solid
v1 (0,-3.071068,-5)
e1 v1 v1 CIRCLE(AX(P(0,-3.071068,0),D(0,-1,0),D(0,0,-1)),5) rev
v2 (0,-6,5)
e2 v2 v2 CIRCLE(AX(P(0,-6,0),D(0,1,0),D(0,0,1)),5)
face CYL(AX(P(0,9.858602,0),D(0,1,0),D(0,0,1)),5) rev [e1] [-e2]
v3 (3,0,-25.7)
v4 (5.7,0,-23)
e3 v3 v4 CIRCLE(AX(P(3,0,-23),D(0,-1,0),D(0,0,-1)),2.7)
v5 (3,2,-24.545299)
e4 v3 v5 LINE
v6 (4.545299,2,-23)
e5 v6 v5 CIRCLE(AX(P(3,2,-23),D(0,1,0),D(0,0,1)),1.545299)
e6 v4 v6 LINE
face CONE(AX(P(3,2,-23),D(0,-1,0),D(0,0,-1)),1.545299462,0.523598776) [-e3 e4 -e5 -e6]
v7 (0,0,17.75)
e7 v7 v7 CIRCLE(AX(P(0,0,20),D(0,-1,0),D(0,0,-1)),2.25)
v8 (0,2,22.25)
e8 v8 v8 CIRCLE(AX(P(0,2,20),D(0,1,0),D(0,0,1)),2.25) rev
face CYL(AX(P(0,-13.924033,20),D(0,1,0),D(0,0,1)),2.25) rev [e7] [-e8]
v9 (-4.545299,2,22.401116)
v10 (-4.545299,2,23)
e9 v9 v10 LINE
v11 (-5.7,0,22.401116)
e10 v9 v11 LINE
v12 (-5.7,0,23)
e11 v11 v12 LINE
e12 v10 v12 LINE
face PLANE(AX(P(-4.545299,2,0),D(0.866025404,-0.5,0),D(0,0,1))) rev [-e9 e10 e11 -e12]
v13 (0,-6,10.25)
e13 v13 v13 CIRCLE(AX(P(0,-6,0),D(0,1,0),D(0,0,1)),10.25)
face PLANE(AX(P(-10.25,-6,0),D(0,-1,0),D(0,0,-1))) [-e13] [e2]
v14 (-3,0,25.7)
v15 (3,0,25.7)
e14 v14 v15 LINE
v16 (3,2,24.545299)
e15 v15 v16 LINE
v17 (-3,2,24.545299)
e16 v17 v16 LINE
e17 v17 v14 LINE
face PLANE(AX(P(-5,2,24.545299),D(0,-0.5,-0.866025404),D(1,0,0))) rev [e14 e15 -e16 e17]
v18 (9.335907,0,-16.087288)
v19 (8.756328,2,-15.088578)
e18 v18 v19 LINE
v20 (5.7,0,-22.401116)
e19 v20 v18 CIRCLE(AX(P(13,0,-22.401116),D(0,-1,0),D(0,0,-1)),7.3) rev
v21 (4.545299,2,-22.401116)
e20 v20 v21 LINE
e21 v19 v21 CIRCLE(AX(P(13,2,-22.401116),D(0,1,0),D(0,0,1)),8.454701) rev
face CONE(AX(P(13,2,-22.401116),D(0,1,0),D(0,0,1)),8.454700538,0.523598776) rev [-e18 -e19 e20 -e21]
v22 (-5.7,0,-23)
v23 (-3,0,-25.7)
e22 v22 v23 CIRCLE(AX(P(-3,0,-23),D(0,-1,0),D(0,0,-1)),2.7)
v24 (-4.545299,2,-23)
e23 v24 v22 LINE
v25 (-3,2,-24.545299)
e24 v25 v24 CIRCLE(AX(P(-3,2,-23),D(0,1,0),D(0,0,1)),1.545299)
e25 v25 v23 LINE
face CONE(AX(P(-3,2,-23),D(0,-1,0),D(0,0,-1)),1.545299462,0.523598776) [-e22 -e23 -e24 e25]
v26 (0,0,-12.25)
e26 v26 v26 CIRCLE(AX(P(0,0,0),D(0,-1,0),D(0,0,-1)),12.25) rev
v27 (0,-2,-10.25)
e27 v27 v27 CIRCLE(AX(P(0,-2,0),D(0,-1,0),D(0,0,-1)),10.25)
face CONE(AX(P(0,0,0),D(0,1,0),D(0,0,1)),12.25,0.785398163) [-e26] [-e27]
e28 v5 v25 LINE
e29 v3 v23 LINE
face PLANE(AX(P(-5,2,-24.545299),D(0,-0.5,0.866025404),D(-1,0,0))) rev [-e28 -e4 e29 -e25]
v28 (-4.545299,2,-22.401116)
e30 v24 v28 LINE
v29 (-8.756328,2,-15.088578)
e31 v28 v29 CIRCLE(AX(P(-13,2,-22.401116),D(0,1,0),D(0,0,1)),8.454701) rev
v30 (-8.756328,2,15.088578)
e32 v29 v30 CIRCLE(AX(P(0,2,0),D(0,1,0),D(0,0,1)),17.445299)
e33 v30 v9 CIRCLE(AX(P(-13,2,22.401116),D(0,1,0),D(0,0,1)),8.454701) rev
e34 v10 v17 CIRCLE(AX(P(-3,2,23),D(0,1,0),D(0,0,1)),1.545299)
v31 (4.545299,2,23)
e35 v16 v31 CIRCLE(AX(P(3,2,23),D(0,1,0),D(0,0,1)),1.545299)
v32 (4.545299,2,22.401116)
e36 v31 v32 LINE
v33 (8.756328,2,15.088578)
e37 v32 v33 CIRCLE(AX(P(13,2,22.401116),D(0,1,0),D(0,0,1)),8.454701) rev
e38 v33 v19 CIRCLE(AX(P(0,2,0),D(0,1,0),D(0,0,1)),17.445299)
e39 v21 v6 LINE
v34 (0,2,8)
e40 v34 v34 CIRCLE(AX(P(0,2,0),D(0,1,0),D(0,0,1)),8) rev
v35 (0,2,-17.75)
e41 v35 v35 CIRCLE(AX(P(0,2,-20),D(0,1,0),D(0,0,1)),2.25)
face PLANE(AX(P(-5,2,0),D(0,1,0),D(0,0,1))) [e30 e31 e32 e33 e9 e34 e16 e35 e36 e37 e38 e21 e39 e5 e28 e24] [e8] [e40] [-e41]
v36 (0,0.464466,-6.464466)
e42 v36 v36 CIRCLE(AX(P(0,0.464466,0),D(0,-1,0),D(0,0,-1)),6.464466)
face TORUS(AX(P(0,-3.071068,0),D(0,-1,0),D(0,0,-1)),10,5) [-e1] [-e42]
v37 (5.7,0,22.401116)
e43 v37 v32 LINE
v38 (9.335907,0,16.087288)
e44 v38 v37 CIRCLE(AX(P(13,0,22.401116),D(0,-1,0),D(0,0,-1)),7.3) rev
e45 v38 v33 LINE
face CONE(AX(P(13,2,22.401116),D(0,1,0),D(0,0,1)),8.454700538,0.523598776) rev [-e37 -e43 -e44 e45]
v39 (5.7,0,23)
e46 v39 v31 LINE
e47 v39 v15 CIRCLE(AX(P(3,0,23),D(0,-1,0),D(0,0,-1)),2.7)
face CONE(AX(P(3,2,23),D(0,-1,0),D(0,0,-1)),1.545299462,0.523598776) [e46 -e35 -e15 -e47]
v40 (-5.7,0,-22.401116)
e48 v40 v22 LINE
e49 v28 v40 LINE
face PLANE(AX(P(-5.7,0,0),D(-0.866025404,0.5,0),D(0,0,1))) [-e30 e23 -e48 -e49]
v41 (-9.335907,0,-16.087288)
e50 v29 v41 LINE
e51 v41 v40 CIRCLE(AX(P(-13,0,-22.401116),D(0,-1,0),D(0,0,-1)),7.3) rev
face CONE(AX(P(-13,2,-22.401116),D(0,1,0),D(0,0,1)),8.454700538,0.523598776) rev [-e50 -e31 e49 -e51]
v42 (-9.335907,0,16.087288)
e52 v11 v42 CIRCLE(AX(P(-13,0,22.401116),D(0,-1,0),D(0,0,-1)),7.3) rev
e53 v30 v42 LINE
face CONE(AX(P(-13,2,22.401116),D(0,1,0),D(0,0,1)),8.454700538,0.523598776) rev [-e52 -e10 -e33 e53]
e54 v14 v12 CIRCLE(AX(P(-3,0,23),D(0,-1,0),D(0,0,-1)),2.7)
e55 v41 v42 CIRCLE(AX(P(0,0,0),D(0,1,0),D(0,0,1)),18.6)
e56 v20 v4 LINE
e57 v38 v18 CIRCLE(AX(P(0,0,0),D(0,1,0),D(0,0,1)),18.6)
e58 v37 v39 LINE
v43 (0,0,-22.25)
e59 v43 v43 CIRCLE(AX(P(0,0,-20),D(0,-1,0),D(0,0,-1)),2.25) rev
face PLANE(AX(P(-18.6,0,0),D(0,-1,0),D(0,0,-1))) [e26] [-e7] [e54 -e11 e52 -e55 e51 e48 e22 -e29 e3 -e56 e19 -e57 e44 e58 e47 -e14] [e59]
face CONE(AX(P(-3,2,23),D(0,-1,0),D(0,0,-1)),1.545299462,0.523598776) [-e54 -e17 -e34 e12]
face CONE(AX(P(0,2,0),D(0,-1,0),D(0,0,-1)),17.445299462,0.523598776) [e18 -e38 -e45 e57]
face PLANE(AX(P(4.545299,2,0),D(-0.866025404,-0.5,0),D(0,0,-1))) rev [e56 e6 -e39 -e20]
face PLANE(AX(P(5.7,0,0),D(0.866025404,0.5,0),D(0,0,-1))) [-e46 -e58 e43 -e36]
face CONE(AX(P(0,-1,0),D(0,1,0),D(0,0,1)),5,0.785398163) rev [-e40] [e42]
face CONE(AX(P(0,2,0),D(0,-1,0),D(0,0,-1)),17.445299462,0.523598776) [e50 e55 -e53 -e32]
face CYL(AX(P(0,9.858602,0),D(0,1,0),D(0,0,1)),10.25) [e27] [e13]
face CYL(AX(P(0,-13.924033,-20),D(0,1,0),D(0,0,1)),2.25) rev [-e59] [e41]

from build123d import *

# Parameters (mm, degrees)
BOSS_EXTRUDE1_START = -2
BOSS_EXTRUDE1_DEPTH = 2
CUT_EXTRUDE1_REACH  = 34.718
SKETCH2_3_R         = 2.25
FILLET1_R           = 7.3
FILLET2_R           = 2.7
CHAMFER1_SIZE       = 1.154700538
CHAMFER1_SIZE_2     = 2
CHAMFER2_SIZE       = 3
FILLET3_R           = 5
CHAMFER3_SIZE       = 2


with BuildPart() as part:
    # Sketch1 → Revolve1 (revolve)
    with BuildSketch(Plane.XY, mode=Mode.PRIVATE) as revolve1_sk:
        Polygon((-5, 0), (-5, 2), (-18.6, 2), (-18.6, 0), (-10.25, 0), (-10.25, -6), (-5, -6), align=None)
    revolve(revolve1_sk.sketch.rotate(Axis((0, 9.858601723, 0), (0, -1, 0)), 270), axis=Axis((0, 9.858601723, 0), (0, -1, 0)))

    # Sketch2 → Boss-Extrude1 (add)
    with BuildSketch(Plane(origin=(0, 2, 0), x_dir=(1, 0, 0), z_dir=(0, 1, 0)).offset(BOSS_EXTRUDE1_START)):
        with BuildLine():
            Line((-5.7, 25.7), (-5.7, 17.705084016))
            ThreePointArc((-5.7, 17.705084016), (-3.720937263, 18.224012343), (-1.696852692, 18.5224375))
            ThreePointArc((-1.696852692, 18.5224375), (-0.788854056, 22.10718041), (2.25, 20))
            ThreePointArc((2.25, 20), (2.10718041, 19.211145944), (1.696852692, 18.5224375))
            ThreePointArc((1.696852692, 18.5224375), (3.720937263, 18.224012343), (5.7, 17.705084016))
            Line((5.7, 17.705084016), (5.7, 25.7))
            Line((5.7, 25.7), (0.005376723, 25.7))
            Line((0.005376723, 25.7), (-0.005376723, 25.7))
            Line((-0.005376723, 25.7), (-5.7, 25.7))
        make_face()
        with BuildLine():
            ThreePointArc((-1.696852692, -18.5224375), (-3.720937263, -18.224012343), (-5.7, -17.705084016))
            Line((-5.7, -17.705084016), (-5.7, -25.7))
            Line((-5.7, -25.7), (-0.005376723, -25.7))
            Line((-0.005376723, -25.7), (0.005376723, -25.7))
            Line((0.005376723, -25.7), (5.7, -25.7))
            Line((5.7, -25.7), (5.7, -17.705084016))
            ThreePointArc((5.7, -17.705084016), (3.720937263, -18.224012343), (1.696852692, -18.5224375))
            ThreePointArc((1.696852692, -18.5224375), (2.10718041, -19.211145944), (2.25, -20))
            ThreePointArc((2.25, -20), (-0.788854056, -22.10718041), (-1.696852692, -18.5224375))
        make_face()
    extrude(amount=BOSS_EXTRUDE1_DEPTH)

    # Sketch2<3> → Cut-Extrude1 (cut, up to next)
    with BuildSketch(Plane(origin=(0, 2, 0), x_dir=(1, 0, 0), z_dir=(0, 1, 0)), mode=Mode.PRIVATE) as cut_extrude1_sk1:
        with Locations(Location((0, 20, 0), (0, 0, 270))):
            Circle(SKETCH2_3_R)
    cut_extrude1_tool1 = extrude(cut_extrude1_sk1.sketch, amount=-CUT_EXTRUDE1_REACH, mode=Mode.PRIVATE) & part.part
    # Sketch2<3> → Cut-Extrude1 (cut, up to next)
    with BuildSketch(Plane(origin=(0, 2, 0), x_dir=(1, 0, 0), z_dir=(0, 1, 0)), mode=Mode.PRIVATE) as cut_extrude1_sk2:
        with Locations(Location((0, -20, 0), (0, 0, 270))):
            Circle(SKETCH2_3_R)
    cut_extrude1_tool2 = extrude(cut_extrude1_sk2.sketch, amount=-CUT_EXTRUDE1_REACH, mode=Mode.PRIVATE) & part.part
    add(cut_extrude1_tool1.solids().sort_by_distance((0, 2, -20))[0], mode=Mode.SUBTRACT)
    add(cut_extrude1_tool2.solids().sort_by_distance((0, 2, 20))[0], mode=Mode.SUBTRACT)

    # Fillet1
    fillet1_edges = [part.edges().sort_by_distance(p)[0] for p in [
        (-5.7, 1, -17.705084016),
        (5.7, 1, -17.705084016),
        (-5.7, 1, 17.705084016),
        (5.7, 1, 17.705084016),
    ]]
    fillet(fillet1_edges, radius=FILLET1_R)

    # Fillet2
    fillet2_edges = [part.edges().sort_by_distance(p)[0] for p in [
        (-5.7, 1, -25.7),
        (5.7, 1, -25.7),
        (-5.7, 1, 25.7),
        (5.7, 1, 25.7),
    ]]
    fillet(fillet2_edges, radius=FILLET2_R)

    # Chamfer1
    # the kernel refuses this chamfer: 2, 1.154700538 mm, written as the material it takes off along each edge
    with BuildSketch(Plane(origin=(3, 2, 25.7), x_dir=(0, 0.05789386240267148, -0.9983227437537925), z_dir=(-1, 0, 0)), Plane(origin=(-3, 2, -25.7), x_dir=(0, 0.05789386240267148, 0.9983227437537925), z_dir=(1, 0, 0))) as chamfer1_piece_1:
        Polygon((CHAMFER1_SIZE * 0.998322744082, CHAMFER1_SIZE * 0.0578938624217), (-CHAMFER1_SIZE_2 * 0.0578938624027, CHAMFER1_SIZE_2 * 0.998322743754), (0, 0), align=None)
    extrude(amount=6, mode=Mode.SUBTRACT)
    with BuildSketch(Plane(origin=(5.7, 2, 23), x_dir=(-0.9983227437537925, 0.05789386240267148, 0), z_dir=(0, 0, -1)), Plane(origin=(-5.7, 2, 22.401116044), x_dir=(0.9983227437537925, 0.05789386240267148, 0), z_dir=(0, 0, 1)), Plane(origin=(5.7, 2, -22.401116044), x_dir=(-0.9983227437537925, 0.05789386240267148, 0), z_dir=(0, 0, -1)), Plane(origin=(-5.7, 2, -23), x_dir=(0.9983227437537925, 0.05789386240267148, 0), z_dir=(0, 0, 1))) as chamfer1_piece_2:
        Polygon((CHAMFER1_SIZE * 0.998322744082, -CHAMFER1_SIZE * 0.0578938624217), (-CHAMFER1_SIZE_2 * 0.0578938624027, -CHAMFER1_SIZE_2 * 0.998322743754), (0, 0), align=None)
    extrude(amount=0.598883956, mode=Mode.SUBTRACT)
    with BuildSketch(Plane(origin=(13, 2, 22.401116044), x_dir=(-1, 0, 0), z_dir=(0, 0, 1))) as chamfer1_piece_3:
        Polygon((7.3 + CHAMFER1_SIZE, 0), (7.3, CHAMFER1_SIZE_2), (7.3, 0), align=None)
    revolve(axis=Axis((13, 2, 22.401116044), (0, -1, 0)), revolution_arc=59.87219662, mode=Mode.SUBTRACT)
    with BuildSketch(Plane(origin=(-13, 2, 22.401116044), x_dir=(0.5019305019305016, 0, -0.8649079553523569), z_dir=(-0.8649079553523569, 0, -0.5019305019305016))) as chamfer1_piece_4:
        Polygon((7.3 + CHAMFER1_SIZE, 0), (7.3, CHAMFER1_SIZE_2), (7.3, 0), align=None)
    revolve(axis=Axis((-13, 2, 22.401116044), (0, -1, 0)), revolution_arc=59.87219662, mode=Mode.SUBTRACT)
    with BuildSketch(Plane(origin=(0, 2, 0), x_dir=(0.5019305019305017, 0, -0.8649079553523569), z_dir=(-0.8649079553523569, 0, -0.5019305019305017))) as chamfer1_piece_5:
        Polygon((18.6 - CHAMFER1_SIZE, 0), (18.6, CHAMFER1_SIZE_2), (18.6, 0), align=None)
    revolve(axis=Axis((0, 2, 0), (0, -1, 0)), revolution_arc=119.74439324, mode=Mode.SUBTRACT)
    with BuildSketch(Plane(origin=(0, 2, 0), x_dir=(-0.5019305019305019, 0, 0.8649079553523568), z_dir=(0.8649079553523568, 0, 0.5019305019305019))) as chamfer1_piece_6:
        Polygon((18.6 - CHAMFER1_SIZE, 0), (18.6, CHAMFER1_SIZE_2), (18.6, 0), align=None)
    revolve(axis=Axis((0, 2, 0), (0, -1, 0)), revolution_arc=119.74439324, mode=Mode.SUBTRACT)
    with BuildSketch(Plane(origin=(13, 2, -22.401116044), x_dir=(-1, 0, 0), z_dir=(0, 0, -1))) as chamfer1_piece_7:
        Polygon((7.3 + CHAMFER1_SIZE, 0), (7.3, -CHAMFER1_SIZE_2), (7.3, 0), align=None)
    revolve(axis=Axis((13, 2, -22.401116044), (0, 1, 0)), revolution_arc=59.87219662, mode=Mode.SUBTRACT)
    with BuildSketch(Plane(origin=(-13, 2, -22.401116044), x_dir=(0.5019305019305013, 0, 0.8649079553523572), z_dir=(-0.8649079553523572, 0, 0.5019305019305013))) as chamfer1_piece_8:
        Polygon((7.3 + CHAMFER1_SIZE, 0), (7.3, -CHAMFER1_SIZE_2), (7.3, 0), align=None)
    revolve(axis=Axis((-13, 2, -22.401116044), (0, 1, 0)), revolution_arc=59.87219662, mode=Mode.SUBTRACT)
    with BuildSketch(Plane(origin=(3, 2, 23), x_dir=(0, 0, 1), z_dir=(-1, 0, 0))) as chamfer1_piece_9:
        Polygon((2.7 - CHAMFER1_SIZE, 0), (2.7, -CHAMFER1_SIZE_2), (2.7, 0), align=None)
    revolve(axis=Axis((3, 2, 23), (0, 1, 0)), revolution_arc=90, mode=Mode.SUBTRACT)
    with BuildSketch(Plane(origin=(-3, 2, 23), x_dir=(-1, 0, 0), z_dir=(0, 0, -1))) as chamfer1_piece_10:
        Polygon((2.7 - CHAMFER1_SIZE, 0), (2.7, -CHAMFER1_SIZE_2), (2.7, 0), align=None)
    revolve(axis=Axis((-3, 2, 23), (0, 1, 0)), revolution_arc=90, mode=Mode.SUBTRACT)
    with BuildSketch(Plane(origin=(3, 2, -23), x_dir=(0, 0, -1), z_dir=(-1, 0, 0))) as chamfer1_piece_11:
        Polygon((2.7 - CHAMFER1_SIZE, 0), (2.7, CHAMFER1_SIZE_2), (2.7, 0), align=None)
    revolve(axis=Axis((3, 2, -23), (0, -1, 0)), revolution_arc=90, mode=Mode.SUBTRACT)
    with BuildSketch(Plane(origin=(-3, 2, -23), x_dir=(-1, 0, 0), z_dir=(0, 0, 1))) as chamfer1_piece_12:
        Polygon((2.7 - CHAMFER1_SIZE, 0), (2.7, CHAMFER1_SIZE_2), (2.7, 0), align=None)
    revolve(axis=Axis((-3, 2, -23), (0, -1, 0)), revolution_arc=90, mode=Mode.SUBTRACT)

    # Chamfer2
    chamfer2_edges = [part.edges().sort_by_distance(p)[0] for p in [
        (0, 2, -5),
    ]]
    chamfer(chamfer2_edges, length=CHAMFER2_SIZE)

    # Fillet3
    fillet3_edges = [part.edges().sort_by_distance(p)[0] for p in [
        (0, -1, -5),
    ]]
    fillet(fillet3_edges, radius=FILLET3_R)

    # Chamfer3
    chamfer3_edges = [part.edges().sort_by_distance(p)[0] for p in [
        (0, 0, -10.25),
    ]]
    chamfer(chamfer3_edges, length=CHAMFER3_SIZE)


solid = part.part
